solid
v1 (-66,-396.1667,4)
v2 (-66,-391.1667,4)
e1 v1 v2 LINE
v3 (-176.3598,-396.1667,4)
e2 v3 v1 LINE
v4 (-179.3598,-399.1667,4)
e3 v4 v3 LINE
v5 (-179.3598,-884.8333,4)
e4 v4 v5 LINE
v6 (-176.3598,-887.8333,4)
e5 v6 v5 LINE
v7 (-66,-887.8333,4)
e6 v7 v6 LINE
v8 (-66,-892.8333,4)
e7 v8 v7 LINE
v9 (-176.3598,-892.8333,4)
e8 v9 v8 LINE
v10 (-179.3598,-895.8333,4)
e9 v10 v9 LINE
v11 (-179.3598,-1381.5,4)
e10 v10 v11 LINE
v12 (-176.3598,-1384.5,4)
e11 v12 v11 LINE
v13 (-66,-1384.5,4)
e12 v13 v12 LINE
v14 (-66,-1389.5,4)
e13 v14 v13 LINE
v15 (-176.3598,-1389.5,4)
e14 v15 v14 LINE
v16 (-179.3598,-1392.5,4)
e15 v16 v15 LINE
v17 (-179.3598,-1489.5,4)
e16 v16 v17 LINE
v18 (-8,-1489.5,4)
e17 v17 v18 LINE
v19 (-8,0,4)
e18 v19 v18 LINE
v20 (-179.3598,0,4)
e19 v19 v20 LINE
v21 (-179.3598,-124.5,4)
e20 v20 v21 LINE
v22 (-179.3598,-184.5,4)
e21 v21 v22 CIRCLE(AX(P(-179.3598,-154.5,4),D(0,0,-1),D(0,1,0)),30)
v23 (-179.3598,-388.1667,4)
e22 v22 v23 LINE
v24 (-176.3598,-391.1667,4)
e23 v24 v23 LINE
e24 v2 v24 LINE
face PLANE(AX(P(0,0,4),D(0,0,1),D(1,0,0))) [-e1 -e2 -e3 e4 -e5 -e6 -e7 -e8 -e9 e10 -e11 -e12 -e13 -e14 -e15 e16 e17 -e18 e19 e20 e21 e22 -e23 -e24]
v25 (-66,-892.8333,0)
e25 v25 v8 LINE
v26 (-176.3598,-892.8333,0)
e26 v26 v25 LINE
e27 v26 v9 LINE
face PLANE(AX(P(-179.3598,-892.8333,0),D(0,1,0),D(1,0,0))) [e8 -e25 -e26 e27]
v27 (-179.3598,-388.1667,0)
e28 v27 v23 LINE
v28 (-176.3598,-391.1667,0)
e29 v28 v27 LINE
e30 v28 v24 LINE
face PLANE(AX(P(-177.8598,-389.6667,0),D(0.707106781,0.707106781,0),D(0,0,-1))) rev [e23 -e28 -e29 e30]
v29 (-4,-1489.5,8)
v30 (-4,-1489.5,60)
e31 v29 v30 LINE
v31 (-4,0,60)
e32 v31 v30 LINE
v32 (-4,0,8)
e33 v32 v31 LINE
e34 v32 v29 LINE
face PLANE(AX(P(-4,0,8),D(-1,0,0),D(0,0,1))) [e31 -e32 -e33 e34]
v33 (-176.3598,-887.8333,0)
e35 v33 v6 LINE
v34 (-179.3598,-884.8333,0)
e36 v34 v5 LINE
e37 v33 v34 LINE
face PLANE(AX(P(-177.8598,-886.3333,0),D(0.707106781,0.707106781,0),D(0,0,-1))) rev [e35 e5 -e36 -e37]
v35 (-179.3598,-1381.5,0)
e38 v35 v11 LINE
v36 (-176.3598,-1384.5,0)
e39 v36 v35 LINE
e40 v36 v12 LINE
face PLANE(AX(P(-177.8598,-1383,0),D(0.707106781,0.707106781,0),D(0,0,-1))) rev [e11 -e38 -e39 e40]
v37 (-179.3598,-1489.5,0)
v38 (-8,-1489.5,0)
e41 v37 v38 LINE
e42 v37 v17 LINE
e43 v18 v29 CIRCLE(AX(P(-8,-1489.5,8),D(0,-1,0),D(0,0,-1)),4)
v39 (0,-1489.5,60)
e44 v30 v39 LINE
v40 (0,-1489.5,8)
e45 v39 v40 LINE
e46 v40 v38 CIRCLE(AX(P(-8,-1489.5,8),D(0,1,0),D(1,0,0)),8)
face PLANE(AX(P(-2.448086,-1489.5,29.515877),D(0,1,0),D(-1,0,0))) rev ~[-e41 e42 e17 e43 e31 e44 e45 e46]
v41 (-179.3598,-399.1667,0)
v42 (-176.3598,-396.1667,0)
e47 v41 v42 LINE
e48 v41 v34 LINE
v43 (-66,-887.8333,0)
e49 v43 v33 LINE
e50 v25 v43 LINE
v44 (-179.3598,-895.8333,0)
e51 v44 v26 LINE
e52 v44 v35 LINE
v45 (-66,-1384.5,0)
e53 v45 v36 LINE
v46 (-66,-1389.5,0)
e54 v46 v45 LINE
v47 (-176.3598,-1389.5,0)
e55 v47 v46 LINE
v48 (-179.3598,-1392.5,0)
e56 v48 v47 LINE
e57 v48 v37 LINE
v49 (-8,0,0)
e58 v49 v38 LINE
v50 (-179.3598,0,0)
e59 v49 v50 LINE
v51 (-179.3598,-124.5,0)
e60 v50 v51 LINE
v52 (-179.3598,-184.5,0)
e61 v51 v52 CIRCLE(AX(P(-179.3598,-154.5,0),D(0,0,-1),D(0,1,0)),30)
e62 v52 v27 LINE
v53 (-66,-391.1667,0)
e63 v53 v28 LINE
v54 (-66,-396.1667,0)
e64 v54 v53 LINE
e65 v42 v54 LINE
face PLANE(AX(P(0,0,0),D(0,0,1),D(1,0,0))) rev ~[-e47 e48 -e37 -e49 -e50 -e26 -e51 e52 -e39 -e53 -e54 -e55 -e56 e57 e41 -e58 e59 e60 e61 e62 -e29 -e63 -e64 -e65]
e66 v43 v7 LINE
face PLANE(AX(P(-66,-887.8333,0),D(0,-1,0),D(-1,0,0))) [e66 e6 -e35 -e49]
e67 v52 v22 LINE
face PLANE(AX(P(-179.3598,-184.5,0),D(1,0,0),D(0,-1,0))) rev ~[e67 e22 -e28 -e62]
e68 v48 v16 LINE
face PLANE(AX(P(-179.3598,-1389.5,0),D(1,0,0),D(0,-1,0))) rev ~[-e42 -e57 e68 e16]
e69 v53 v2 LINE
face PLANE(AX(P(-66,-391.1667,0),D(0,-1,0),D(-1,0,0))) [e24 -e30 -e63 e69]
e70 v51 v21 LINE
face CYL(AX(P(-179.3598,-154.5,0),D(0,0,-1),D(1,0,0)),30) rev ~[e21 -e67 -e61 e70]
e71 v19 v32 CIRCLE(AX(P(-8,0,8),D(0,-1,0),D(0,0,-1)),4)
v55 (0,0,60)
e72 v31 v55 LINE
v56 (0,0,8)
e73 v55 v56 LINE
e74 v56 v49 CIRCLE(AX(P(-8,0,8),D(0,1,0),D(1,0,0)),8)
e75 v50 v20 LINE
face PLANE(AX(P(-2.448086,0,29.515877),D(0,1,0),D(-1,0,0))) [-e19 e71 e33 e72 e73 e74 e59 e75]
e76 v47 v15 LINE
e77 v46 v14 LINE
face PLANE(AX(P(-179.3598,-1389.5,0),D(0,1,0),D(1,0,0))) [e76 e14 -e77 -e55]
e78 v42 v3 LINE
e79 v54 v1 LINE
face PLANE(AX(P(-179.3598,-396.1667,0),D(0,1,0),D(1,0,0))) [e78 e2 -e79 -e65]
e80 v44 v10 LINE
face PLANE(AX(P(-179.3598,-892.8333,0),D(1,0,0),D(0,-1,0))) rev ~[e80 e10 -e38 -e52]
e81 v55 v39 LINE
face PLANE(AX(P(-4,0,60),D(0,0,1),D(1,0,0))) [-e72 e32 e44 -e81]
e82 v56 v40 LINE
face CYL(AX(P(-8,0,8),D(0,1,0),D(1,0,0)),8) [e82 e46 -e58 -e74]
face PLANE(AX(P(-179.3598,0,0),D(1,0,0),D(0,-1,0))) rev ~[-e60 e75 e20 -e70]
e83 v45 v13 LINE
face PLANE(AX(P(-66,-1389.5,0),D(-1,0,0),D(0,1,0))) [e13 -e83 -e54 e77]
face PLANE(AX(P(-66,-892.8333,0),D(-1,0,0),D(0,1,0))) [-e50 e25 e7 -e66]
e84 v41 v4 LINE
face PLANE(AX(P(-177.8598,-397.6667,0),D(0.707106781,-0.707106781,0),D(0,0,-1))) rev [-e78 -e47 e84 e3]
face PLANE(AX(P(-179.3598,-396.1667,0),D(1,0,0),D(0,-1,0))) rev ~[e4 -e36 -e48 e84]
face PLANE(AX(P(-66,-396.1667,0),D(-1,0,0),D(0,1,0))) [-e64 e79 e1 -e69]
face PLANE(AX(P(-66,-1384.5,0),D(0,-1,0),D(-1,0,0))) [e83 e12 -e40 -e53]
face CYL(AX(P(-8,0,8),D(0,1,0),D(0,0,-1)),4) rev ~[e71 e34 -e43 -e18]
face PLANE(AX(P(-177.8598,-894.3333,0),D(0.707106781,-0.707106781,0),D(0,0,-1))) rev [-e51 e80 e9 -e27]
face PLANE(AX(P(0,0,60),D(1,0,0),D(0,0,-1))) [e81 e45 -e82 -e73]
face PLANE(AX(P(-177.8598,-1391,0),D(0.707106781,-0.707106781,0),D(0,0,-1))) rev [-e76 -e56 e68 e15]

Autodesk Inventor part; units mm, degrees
ref_plane "YZ Plane" through (0, 0, 0) normal (1, 0, 0) x (0, 1, 0)
ref_plane "XZ Plane" through (0, 0, 0) normal (0, 1, 0) x (-1, 0, 0)
ref_plane "XY Plane" through (0, 0, 0) normal (0, 0, 1) x (1, 0, 0)
sketch "Sketch1" plane through (0, 0, 0) normal (0, 0, 1) x (1, 0, 0)
  line L0 (0, 0) -> (-179.3598, 0)
  line L1 (-179.3598, 0) -> (-179.3598, -1489.5)
  line L2 (-179.3598, -1489.5) -> (0, -1489.5)
  line L3 (0, -1489.5) -> (0, 0)
  line L4 (-179.3598, -1389.5) -> (-66, -1389.5)
  line L5 (-66, -1389.5) -> (-66, -1384.5)
  line L6 (-66, -1384.5) -> (-179.3598, -1384.5)
  line L7 (-179.3598, -1384.5) -> (-179.3598, -1389.5)
  line L8 (-179.3598, -892.8333) -> (-66, -892.8333)
  line L9 (-66, -892.8333) -> (-66, -887.8333)
  line L10 (-66, -887.8333) -> (-179.3598, -887.8333)
  line L11 (-179.3598, -887.8333) -> (-179.3598, -892.8333)
  line L12 (-179.3598, -396.1667) -> (-66, -396.1667)
  line L13 (-66, -396.1667) -> (-66, -391.1667)
  line L14 (-66, -391.1667) -> (-179.3598, -391.1667)
  line L15 (-179.3598, -391.1667) -> (-179.3598, -396.1667)
  circle A0 centre (-179.3598, -154.5) radius 30
  point P0 (-179.3598, -396.1667)
  point P1 (-179.3598, -124.5)
  point P2 (-179.3598, -184.5)
  dimension "d0" = 1489.5
  dimension "d1" = 179.3598
  dimension "d2" = 5
  dimension "d4" = 100
  dimension "d7" = 496.6667
  dimension "d23" = 66
  dimension "d28" = 60
  dimension "d30" = 1335
extrude "Plate1" add sketch "Sketch1" along normal blind 4 contours L3 L2 L1 L4 L5 L6 L8 L9 L10 L12 L13 L14 A0 L0
sketch "Sketch2" plane through (-4, 0, 0) normal (1, 0, 0) x (0, 1, 0)
  line L0 (-1489.5, 0) -> (0, 0)
  line L1 (0, 0) -> (0, 60)
  line L2 (0, 60) -> (-1489.5, 60)
  line L3 (-1489.5, 60) -> (-1489.5, 0)
edge flange "Flange1" height 60 angle 90 thickness 4 bend radius 4 thickness toward (1, 0, 0) relief tear relief width 4 relief depth 2 edges at (0, -744.75, 4) wall of the first edge with corners at (-4, -1489.5, 0) (-4, 0, 0) (-4, 0, 60) (-4, -1489.5, 60)
bend "Bend1"
corner "Corner1"
chamfer "Corner Chamfer1" distance 3 angle 45 6 edges at (-179.3598, -1389.5, 2) (-179.3598, -1384.5, 2) (-179.3598, -892.8333, 2) (-179.3598, -887.8333, 2) (-179.3598, -391.1667, 2) (-179.3598, -396.1667, 2)
equation "\"d0\" = Стрингер_длина"
equation "\"d1\" = стрингер_глубина_2"
equation "\"d2\" = паз_под_стрингер_толщина"
equation "\"d7\" = Шаг_шпангоутов"
equation "\"d23\" = паз_под_стрингер_глубина - Thickness"
equation "\"d28\" = 2 * радиус_выреза_под_сварку"
equation "\"d12\" = Thickness"
equation "\"d13\" = BendReliefWidth"
equation "\"d14\" = BendReliefDepth"
equation "\"d15\" = MinimumRemnant"
equation "\"d16\" = TransitionRadius"
equation "\"d17\" = ребро_усилителей"
equation "\"d19\" = BendRadius"
equation "\"d20\" = CornerReliefSize"
equation "\"d21\" = GapSize"
equation "\"d22\" = JacobiRadiusSize"
equation "\"BendRadius\" = Thickness"
equation "\"BendReliefWidth\" = Thickness"
equation "\"BendReliefDepth\" = 0.5 * Thickness"
equation "\"CornerReliefSize\" = 4 * Thickness"
equation "\"MinimumRemnant\" = 2 * Thickness"
equation "\"TransitionRadius\" = BendRadius"
equation "\"JacobiRadiusSize\" = BendRadius"
equation "\"GapSize\" = Thickness"
equation "\"Стрингер_длина\" = 1489.5"
equation "\"стрингер_глубина_2\" = 179.359772"
equation "\"паз_под_стрингер_толщина\" = 5"
equation "\"Шаг_шпангоутов\" = 496.666667"
equation "\"паз_под_стрингер_глубина\" = 70"
equation "\"Thickness\" = 4"
equation "\"радиус_выреза_под_сварку\" = 30"
equation "\"ребро_усилителей\" = 60"
properties part number "GBK 0103 stringer 2" material "Steel"
